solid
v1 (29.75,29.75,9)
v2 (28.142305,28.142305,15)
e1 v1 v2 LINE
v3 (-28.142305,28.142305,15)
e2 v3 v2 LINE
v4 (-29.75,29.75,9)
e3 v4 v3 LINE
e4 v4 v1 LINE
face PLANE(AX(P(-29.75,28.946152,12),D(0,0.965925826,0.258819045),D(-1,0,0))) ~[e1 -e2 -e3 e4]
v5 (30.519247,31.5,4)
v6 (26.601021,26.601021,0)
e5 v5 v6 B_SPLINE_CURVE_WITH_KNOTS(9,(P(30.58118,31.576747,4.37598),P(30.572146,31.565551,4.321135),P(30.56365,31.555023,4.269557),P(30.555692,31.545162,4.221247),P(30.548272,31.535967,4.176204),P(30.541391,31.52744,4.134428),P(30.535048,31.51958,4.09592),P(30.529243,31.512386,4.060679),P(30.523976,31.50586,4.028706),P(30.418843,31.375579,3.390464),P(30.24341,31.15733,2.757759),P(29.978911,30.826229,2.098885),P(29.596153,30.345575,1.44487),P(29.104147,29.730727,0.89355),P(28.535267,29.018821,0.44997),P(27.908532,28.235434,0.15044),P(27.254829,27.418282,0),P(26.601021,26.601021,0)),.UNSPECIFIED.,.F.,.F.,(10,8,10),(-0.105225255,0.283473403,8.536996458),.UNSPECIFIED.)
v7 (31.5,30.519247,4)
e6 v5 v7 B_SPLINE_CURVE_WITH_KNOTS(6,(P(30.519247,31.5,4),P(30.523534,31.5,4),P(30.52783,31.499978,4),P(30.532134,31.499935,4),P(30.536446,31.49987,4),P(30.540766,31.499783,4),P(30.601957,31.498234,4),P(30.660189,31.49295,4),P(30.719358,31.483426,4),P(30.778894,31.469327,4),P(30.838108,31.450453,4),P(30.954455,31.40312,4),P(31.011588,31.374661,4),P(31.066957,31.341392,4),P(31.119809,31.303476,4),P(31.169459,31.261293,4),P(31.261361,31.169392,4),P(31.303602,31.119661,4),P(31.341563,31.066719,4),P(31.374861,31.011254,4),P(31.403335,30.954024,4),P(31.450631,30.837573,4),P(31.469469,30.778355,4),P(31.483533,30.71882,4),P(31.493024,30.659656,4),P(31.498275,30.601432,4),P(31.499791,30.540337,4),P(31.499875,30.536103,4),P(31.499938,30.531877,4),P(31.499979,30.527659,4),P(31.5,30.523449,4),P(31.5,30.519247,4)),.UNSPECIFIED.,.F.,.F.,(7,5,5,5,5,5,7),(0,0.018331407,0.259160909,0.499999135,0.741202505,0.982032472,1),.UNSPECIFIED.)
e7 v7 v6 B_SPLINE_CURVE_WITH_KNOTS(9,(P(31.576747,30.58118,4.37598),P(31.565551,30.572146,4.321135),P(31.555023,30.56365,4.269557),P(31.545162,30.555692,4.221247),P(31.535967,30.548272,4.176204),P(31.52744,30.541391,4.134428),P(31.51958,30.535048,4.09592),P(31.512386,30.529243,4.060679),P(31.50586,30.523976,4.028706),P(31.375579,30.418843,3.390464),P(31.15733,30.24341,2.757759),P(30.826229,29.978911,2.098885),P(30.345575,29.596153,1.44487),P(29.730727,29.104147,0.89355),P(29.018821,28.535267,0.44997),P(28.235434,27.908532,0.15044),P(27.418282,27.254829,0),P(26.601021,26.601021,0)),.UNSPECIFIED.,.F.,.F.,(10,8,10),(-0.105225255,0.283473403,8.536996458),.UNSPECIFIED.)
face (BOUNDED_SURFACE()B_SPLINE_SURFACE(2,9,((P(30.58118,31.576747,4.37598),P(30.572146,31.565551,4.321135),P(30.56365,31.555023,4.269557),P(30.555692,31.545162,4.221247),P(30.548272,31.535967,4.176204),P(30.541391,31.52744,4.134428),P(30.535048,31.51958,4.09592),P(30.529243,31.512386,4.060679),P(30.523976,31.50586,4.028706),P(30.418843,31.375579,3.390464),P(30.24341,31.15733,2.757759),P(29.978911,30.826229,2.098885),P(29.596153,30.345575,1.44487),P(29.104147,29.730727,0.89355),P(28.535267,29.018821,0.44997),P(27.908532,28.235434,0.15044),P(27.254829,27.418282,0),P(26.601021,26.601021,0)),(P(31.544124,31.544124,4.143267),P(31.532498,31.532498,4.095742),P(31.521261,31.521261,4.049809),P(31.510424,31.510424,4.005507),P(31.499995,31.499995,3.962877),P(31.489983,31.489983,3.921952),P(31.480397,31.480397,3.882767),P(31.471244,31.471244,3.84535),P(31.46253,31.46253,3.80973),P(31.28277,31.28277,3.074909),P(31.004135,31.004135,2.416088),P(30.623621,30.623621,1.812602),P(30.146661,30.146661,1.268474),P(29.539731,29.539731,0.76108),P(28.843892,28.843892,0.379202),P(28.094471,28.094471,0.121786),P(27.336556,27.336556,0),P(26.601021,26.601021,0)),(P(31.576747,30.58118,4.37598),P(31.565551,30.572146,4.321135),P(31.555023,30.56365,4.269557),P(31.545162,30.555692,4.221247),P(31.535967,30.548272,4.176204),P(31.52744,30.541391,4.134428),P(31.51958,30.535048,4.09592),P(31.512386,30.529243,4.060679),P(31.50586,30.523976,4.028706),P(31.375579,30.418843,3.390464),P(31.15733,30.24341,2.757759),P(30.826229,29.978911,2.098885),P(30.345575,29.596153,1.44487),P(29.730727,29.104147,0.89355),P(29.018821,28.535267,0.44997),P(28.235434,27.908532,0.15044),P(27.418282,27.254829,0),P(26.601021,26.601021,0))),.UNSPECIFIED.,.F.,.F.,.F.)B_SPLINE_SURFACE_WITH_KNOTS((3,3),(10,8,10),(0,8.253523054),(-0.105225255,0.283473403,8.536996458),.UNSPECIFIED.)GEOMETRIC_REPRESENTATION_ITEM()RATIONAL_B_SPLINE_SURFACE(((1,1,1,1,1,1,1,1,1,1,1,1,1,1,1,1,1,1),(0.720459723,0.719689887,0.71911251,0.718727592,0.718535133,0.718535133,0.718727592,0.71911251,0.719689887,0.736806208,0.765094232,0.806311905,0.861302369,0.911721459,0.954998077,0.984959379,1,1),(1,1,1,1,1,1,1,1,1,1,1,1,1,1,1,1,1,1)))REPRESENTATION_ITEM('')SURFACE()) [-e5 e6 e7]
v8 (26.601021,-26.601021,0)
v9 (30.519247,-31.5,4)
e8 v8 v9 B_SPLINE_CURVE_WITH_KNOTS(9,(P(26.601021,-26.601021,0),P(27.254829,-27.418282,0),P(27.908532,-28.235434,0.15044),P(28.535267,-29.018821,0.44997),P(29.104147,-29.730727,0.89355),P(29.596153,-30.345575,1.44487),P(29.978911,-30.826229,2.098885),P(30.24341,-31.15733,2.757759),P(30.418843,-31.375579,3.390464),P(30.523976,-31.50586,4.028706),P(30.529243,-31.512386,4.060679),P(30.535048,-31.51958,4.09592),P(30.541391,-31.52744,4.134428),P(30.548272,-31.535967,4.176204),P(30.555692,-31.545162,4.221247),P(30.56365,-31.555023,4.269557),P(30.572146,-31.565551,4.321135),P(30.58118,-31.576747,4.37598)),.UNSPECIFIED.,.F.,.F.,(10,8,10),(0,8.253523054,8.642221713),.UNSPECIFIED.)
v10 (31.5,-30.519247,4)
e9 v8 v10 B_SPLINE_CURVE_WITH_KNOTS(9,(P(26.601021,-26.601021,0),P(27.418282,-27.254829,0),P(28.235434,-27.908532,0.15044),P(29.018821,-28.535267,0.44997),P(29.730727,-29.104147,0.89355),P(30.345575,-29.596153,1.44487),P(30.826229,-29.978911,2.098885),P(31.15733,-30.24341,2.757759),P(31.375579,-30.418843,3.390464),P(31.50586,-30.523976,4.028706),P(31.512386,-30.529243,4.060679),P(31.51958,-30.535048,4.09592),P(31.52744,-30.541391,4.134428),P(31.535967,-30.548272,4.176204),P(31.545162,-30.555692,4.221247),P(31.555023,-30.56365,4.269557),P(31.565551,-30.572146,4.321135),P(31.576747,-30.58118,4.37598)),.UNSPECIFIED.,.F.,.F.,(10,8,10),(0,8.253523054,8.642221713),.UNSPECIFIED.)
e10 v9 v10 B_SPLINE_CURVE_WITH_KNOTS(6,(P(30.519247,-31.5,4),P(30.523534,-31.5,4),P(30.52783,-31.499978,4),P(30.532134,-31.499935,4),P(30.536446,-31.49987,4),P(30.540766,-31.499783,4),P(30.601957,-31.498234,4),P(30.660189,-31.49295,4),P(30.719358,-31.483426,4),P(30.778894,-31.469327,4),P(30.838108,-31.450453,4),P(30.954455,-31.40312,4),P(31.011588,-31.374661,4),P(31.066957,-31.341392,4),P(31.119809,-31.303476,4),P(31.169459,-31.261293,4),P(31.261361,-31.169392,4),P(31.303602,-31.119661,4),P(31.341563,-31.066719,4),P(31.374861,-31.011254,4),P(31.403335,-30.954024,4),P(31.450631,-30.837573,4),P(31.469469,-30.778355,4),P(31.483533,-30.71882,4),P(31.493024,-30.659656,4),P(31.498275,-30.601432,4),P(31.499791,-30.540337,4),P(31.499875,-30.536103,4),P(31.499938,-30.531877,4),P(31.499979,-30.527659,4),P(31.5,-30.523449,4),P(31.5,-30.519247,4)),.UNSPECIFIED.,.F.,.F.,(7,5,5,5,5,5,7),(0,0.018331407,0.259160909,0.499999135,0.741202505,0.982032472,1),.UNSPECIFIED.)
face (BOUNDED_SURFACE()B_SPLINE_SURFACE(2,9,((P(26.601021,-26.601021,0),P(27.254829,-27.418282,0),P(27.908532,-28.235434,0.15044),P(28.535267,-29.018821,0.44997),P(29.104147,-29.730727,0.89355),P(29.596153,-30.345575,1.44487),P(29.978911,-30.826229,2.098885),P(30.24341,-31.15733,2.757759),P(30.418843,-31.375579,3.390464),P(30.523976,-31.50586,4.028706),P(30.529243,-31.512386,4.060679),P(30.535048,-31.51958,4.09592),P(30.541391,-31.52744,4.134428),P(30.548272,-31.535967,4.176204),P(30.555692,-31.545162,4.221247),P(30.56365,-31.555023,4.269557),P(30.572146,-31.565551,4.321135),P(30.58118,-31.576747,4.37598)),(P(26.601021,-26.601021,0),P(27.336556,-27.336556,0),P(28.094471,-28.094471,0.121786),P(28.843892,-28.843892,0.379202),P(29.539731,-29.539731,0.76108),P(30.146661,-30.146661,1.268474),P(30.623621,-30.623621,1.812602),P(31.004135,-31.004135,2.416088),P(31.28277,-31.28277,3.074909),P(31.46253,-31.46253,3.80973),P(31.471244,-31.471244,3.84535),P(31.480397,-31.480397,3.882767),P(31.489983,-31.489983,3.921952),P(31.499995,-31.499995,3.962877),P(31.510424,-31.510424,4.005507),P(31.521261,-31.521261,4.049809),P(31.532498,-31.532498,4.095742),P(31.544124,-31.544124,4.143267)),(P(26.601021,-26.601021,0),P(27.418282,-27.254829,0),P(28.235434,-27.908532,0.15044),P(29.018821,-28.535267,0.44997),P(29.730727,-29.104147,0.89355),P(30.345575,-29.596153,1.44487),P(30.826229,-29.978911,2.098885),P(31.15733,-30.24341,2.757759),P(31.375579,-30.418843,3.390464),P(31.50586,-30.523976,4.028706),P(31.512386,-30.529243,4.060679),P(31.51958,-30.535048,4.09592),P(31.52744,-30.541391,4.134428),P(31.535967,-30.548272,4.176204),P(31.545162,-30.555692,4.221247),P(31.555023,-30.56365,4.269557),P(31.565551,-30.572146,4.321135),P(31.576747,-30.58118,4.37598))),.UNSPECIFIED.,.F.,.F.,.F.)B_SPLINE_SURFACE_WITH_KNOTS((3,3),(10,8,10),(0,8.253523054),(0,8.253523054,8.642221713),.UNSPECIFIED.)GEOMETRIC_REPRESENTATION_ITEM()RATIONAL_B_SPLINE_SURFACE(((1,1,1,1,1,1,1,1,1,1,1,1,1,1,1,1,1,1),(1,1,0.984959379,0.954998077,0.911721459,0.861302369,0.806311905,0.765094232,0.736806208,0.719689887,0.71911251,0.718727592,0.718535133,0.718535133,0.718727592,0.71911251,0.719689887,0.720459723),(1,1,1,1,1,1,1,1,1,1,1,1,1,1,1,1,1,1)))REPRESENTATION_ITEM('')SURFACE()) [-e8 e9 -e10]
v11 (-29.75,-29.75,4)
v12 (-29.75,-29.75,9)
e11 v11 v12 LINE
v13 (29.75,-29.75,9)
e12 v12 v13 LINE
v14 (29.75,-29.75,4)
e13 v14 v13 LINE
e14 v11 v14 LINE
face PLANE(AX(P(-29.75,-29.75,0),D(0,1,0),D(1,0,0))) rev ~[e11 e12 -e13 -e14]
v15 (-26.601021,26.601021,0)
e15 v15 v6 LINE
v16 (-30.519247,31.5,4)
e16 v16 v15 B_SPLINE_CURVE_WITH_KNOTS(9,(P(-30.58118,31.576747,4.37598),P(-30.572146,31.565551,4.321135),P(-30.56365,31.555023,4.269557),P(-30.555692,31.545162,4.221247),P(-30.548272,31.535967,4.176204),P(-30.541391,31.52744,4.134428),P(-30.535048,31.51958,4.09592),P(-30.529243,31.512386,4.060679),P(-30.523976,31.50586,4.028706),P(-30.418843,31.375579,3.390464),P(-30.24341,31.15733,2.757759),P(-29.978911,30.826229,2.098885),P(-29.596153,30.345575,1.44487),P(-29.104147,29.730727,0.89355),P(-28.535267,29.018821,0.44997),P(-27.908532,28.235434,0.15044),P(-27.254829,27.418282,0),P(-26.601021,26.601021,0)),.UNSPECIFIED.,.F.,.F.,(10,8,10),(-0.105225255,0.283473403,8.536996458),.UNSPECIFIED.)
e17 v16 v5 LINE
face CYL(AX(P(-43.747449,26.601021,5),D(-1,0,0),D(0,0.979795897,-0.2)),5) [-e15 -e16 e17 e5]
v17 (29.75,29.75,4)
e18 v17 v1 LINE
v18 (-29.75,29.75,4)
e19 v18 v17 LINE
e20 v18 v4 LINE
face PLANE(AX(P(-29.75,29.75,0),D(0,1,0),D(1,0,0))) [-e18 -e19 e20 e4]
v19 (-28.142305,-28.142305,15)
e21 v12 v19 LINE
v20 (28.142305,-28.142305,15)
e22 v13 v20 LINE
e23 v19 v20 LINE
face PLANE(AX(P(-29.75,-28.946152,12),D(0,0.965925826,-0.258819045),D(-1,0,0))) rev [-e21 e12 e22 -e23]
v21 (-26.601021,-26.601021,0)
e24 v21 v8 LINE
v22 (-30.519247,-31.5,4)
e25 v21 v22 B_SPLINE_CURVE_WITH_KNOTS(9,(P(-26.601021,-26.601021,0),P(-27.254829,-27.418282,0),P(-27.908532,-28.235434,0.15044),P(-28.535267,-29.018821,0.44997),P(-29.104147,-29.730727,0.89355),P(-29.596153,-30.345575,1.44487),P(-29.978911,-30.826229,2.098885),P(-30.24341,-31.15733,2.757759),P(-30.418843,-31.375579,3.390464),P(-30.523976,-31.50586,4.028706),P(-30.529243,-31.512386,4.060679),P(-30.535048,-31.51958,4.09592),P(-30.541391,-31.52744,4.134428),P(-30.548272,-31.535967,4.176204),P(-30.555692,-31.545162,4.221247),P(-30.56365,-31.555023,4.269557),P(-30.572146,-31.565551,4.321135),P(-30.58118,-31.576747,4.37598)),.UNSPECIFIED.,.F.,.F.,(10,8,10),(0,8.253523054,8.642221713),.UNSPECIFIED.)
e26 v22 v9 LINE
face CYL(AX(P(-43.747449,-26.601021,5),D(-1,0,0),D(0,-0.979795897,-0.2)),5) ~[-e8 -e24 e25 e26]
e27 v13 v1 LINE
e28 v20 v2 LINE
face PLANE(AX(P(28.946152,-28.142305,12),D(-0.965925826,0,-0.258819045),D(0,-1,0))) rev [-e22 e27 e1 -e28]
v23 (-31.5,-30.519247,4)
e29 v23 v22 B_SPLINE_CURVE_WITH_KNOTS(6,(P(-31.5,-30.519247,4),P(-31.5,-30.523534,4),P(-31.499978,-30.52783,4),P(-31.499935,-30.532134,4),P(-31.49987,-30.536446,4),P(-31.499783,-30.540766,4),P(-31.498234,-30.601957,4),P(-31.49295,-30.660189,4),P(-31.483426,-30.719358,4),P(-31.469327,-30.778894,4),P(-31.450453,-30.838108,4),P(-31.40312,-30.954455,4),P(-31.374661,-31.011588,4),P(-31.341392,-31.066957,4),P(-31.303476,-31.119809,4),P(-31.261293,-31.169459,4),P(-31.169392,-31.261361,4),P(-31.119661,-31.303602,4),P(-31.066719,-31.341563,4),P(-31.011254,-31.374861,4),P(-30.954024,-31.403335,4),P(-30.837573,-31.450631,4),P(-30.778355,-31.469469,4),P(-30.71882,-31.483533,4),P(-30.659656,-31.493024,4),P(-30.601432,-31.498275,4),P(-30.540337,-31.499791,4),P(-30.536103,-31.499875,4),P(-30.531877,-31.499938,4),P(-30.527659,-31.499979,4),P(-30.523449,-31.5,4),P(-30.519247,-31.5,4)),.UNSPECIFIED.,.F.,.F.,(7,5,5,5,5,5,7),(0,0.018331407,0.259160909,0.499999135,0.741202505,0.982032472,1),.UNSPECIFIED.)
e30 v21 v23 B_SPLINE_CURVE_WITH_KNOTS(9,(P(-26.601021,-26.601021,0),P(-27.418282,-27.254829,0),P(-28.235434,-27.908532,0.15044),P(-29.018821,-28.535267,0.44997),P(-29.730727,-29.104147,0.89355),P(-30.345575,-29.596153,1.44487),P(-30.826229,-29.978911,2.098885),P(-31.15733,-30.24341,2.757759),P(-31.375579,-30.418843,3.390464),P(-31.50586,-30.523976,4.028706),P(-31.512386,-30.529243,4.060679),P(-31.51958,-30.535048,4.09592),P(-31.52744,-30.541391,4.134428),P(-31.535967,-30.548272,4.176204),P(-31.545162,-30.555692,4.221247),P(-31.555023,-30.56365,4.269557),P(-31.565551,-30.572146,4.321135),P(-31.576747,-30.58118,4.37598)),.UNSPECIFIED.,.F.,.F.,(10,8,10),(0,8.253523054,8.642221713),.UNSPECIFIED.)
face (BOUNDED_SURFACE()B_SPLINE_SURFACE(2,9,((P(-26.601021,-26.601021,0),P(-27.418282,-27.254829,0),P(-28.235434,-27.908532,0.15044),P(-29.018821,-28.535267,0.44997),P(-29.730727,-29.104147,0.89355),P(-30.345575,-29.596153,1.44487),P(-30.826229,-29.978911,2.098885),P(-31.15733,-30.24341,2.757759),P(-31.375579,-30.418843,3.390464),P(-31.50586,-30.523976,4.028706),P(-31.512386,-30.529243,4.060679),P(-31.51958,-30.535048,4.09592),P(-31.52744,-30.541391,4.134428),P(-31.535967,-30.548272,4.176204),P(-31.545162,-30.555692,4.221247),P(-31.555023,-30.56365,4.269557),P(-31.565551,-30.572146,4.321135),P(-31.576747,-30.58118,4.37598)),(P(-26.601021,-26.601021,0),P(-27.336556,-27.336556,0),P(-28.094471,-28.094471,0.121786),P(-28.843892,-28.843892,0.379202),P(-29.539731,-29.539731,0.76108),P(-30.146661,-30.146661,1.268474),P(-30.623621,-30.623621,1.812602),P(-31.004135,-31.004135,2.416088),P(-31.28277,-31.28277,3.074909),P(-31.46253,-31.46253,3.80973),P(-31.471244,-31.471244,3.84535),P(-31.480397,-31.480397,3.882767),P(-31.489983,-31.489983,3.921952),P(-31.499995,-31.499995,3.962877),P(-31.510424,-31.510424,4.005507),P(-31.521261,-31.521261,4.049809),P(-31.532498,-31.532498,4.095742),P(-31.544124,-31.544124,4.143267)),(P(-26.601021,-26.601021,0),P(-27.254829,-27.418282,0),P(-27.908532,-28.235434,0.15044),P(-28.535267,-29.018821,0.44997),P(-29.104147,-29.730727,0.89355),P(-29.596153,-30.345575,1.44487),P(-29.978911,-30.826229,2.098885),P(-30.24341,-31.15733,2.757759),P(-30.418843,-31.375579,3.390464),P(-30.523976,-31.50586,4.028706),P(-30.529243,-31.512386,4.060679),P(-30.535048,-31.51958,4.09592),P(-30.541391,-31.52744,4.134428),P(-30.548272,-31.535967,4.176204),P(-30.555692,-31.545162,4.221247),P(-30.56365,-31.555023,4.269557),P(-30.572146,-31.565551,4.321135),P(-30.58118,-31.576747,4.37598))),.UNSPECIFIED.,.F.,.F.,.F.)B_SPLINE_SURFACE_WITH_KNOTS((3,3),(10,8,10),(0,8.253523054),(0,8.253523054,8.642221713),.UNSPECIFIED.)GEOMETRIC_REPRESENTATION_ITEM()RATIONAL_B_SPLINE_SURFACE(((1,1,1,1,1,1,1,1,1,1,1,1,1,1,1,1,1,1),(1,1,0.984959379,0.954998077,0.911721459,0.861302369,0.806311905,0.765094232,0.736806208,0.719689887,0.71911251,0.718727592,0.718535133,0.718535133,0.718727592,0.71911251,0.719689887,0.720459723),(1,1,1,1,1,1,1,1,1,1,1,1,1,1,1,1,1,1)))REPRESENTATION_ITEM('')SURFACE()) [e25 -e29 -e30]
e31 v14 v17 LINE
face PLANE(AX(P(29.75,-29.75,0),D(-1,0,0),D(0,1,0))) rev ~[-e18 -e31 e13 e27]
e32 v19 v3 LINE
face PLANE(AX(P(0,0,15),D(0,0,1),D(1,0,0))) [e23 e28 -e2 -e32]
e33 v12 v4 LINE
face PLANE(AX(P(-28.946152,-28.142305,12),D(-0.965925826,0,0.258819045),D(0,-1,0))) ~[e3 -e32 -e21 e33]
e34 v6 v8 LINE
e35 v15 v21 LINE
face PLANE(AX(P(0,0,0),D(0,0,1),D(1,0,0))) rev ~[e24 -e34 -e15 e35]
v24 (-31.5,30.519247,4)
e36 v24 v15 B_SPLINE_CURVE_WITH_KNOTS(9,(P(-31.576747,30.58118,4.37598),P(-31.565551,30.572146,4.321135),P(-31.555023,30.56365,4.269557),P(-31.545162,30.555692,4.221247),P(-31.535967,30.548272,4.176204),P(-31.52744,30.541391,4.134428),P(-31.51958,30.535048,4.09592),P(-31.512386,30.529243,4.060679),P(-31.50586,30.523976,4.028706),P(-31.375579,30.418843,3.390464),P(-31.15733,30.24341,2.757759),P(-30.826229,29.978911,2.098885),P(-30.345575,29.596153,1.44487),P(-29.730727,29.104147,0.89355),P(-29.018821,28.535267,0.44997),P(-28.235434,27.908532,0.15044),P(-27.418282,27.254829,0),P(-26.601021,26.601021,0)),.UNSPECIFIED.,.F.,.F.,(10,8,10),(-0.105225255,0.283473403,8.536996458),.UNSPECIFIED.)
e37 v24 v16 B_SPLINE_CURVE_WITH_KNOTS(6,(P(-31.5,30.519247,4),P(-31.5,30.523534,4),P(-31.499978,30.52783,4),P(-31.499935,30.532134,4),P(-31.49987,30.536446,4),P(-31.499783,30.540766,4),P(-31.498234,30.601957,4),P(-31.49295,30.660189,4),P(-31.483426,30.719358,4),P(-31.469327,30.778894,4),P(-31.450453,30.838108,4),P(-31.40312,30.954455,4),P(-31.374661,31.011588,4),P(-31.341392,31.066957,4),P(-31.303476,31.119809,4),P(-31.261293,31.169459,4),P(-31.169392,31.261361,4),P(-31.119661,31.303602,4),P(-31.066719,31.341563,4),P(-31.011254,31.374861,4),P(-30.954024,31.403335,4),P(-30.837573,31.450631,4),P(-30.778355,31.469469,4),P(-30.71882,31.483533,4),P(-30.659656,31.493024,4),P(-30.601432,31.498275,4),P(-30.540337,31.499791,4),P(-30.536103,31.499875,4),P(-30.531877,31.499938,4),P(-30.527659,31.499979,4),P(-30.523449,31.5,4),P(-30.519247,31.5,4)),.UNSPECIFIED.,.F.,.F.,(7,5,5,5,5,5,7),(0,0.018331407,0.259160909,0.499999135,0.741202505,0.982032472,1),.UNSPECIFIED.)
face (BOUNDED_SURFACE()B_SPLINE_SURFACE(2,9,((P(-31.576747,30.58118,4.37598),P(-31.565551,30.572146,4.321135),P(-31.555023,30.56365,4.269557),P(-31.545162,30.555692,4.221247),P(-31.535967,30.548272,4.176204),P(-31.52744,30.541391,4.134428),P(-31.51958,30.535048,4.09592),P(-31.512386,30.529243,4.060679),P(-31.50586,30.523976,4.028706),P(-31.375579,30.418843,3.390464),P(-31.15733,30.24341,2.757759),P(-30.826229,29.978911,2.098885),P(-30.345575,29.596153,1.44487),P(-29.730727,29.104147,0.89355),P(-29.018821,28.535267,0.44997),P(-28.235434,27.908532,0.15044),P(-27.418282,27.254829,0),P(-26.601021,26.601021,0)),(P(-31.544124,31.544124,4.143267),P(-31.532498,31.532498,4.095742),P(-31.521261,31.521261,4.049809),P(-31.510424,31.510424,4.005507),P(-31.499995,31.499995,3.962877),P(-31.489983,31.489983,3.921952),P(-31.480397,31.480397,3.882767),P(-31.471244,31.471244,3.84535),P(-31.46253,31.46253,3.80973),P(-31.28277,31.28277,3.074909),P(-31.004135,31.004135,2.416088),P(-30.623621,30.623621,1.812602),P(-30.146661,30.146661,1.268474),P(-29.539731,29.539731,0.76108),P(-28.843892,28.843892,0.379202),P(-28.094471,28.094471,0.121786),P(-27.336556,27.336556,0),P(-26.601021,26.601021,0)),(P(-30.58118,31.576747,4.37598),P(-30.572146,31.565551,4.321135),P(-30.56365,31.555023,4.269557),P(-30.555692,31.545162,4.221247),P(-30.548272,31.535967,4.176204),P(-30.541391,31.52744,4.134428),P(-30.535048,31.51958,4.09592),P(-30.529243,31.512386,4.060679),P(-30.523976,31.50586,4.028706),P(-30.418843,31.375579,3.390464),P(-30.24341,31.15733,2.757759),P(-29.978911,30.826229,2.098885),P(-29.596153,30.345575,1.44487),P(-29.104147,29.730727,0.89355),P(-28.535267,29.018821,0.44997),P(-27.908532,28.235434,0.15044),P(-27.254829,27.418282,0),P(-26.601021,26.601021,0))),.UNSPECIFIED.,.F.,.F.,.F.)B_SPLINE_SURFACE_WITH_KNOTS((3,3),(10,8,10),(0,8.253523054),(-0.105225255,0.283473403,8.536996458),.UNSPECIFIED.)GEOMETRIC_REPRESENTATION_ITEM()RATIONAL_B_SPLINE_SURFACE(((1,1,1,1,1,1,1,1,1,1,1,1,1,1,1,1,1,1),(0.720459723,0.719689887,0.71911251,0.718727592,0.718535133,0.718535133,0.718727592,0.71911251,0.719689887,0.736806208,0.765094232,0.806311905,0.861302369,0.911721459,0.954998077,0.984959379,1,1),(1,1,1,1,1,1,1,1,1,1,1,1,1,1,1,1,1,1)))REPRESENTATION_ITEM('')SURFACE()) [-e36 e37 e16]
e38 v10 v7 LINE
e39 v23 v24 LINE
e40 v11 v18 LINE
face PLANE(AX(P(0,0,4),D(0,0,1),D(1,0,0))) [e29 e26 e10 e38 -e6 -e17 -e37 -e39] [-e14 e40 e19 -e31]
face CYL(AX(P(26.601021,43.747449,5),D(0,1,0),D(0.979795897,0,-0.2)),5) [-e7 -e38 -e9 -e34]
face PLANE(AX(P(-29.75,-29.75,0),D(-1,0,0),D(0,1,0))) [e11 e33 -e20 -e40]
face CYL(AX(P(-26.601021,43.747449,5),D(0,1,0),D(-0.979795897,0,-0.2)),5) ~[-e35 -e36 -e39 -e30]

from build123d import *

# Parameters (mm, degrees)
F0_W        = 59.5
F0_H        = 59.5
F1_DEPTH    = 15
F0_W_2      = 63
F0_H_2      = 63
F2_DEPTH    = 4
F3_T1_DEPTH = 87.4948974279
F3_T3_DEPTH = 87.4948974279
F4_C1_SIZE2 = 1.6076951546
F4_C1_SIZE  = 6
F4_C2_SIZE2 = 1.6076951546
F4_C2_SIZE  = 6
F4_C3_SIZE2 = 1.6076951546
F4_C3_SIZE  = 6
F4_C4_SIZE2 = 1.6076951546
F4_C4_SIZE  = 6
F5_R        = 1


# Not quite as in the source:
# - a fillet or chamfer that OpenCascade refuses, or shapes differently, is made with other operations: its cross-section is extruded or revolved along the edge and cut away or added


with BuildPart() as f1:
    # F0 (on Top) → F1 (new body)
    with BuildSketch(Plane.XY):
        Rectangle(F0_W, F0_H)
    extrude(amount=F1_DEPTH)

    # F0 (on Top) → F2 (join)
    with BuildSketch(Plane.XY):
        Rectangle(F0_W_2, F0_H_2)
        Rectangle(F0_W, F0_H, mode=Mode.SUBTRACT)
    extrude(amount=F2_DEPTH)

    # F3: fillet of radius 5 on 4 edges, made by hand

    # F3_s2 → F3_t1 (cut)
    with BuildSketch(Plane.YZ.offset(-43.7474487139)):
        with BuildLine():
            ThreePointArc((-31.5, 4), (-29.7632981746, 1.1270166538), (-26.6010205144, 0))
            Line((-26.6010205144, 0), (-31.5, 0))
            Line((-31.5, 0), (-31.5, 4))
        make_face()
        with BuildLine():
            ThreePointArc((31.5, 4), (29.7632981746, 1.1270166538), (26.6010205144, 0))
            Line((26.6010205144, 0), (31.5, 0))
            Line((31.5, 0), (31.5, 4))
        make_face()
    extrude(amount=F3_T1_DEPTH, mode=Mode.SUBTRACT)

    # F3_s4 → F3_t3 (cut)
    with BuildSketch(Plane.XZ.offset(-43.7474487139)):
        with BuildLine():
            ThreePointArc((31.5, 4), (29.7632981746, 1.1270166538), (26.6010205144, 0))
            Line((26.6010205144, 0), (31.5, 0))
            Line((31.5, 0), (31.5, 4))
        make_face()
        with BuildLine():
            ThreePointArc((-31.5, 4), (-29.7632981746, 1.1270166538), (-26.6010205144, 0))
            Line((-26.6010205144, 0), (-31.5, 0))
            Line((-31.5, 0), (-31.5, 4))
        make_face()
    extrude(amount=F3_T3_DEPTH, mode=Mode.SUBTRACT)

    # F4: chamfer of 6 x 1.6076951546 on 4 edges, made by hand

    # F4_c1
    f4_c1_edges = [f1.edges().sort_by_distance(p)[0] for p in [
        (0, -29.75, 15),
    ]]
    f4_c1_side = f1.faces().sort_by_distance((0, -29.75, 14.9678460969))[0]
    chamfer(f4_c1_edges, length=F4_C1_SIZE, length2=F4_C1_SIZE2, reference=f4_c1_side)

    # F4_c2
    f4_c2_edges = [f1.edges().sort_by_distance(p)[0] for p in [
        (29.75, 0.8038475773, 15),
    ]]
    f4_c2_side = f1.faces().sort_by_distance((29.75, 0.8038475773, 14.9678460969))[0]
    chamfer(f4_c2_edges, length=F4_C2_SIZE, length2=F4_C2_SIZE2, reference=f4_c2_side)

    # F4_c3
    f4_c3_edges = [f1.edges().sort_by_distance(p)[0] for p in [
        (-0.8038475773, 29.75, 15),
    ]]
    f4_c3_side = f1.faces().sort_by_distance((-0.8038475773, 29.75, 14.9678460969))[0]
    chamfer(f4_c3_edges, length=F4_C3_SIZE, length2=F4_C3_SIZE2, reference=f4_c3_side)

    # F4_c4
    f4_c4_edges = [f1.edges().sort_by_distance(p)[0] for p in [
        (-29.75, 0, 15),
    ]]
    f4_c4_side = f1.faces().sort_by_distance((-29.75, 0, 14.9678460969))[0]
    chamfer(f4_c4_edges, length=F4_C4_SIZE, length2=F4_C4_SIZE2, reference=f4_c4_side)

    # F5
    f5_edges = [f1.edges().sort_by_distance(p)[0] for p in [
        (-29.517588, -29.517588, 0.938765),
        (-29.517588, 29.517588, 0.938765),
        (29.517588, 29.517588, 0.938765),
        (29.517588, -29.517588, 0.938765),
    ]]
    fillet(f5_edges, radius=F5_R)


solid = f1.part
